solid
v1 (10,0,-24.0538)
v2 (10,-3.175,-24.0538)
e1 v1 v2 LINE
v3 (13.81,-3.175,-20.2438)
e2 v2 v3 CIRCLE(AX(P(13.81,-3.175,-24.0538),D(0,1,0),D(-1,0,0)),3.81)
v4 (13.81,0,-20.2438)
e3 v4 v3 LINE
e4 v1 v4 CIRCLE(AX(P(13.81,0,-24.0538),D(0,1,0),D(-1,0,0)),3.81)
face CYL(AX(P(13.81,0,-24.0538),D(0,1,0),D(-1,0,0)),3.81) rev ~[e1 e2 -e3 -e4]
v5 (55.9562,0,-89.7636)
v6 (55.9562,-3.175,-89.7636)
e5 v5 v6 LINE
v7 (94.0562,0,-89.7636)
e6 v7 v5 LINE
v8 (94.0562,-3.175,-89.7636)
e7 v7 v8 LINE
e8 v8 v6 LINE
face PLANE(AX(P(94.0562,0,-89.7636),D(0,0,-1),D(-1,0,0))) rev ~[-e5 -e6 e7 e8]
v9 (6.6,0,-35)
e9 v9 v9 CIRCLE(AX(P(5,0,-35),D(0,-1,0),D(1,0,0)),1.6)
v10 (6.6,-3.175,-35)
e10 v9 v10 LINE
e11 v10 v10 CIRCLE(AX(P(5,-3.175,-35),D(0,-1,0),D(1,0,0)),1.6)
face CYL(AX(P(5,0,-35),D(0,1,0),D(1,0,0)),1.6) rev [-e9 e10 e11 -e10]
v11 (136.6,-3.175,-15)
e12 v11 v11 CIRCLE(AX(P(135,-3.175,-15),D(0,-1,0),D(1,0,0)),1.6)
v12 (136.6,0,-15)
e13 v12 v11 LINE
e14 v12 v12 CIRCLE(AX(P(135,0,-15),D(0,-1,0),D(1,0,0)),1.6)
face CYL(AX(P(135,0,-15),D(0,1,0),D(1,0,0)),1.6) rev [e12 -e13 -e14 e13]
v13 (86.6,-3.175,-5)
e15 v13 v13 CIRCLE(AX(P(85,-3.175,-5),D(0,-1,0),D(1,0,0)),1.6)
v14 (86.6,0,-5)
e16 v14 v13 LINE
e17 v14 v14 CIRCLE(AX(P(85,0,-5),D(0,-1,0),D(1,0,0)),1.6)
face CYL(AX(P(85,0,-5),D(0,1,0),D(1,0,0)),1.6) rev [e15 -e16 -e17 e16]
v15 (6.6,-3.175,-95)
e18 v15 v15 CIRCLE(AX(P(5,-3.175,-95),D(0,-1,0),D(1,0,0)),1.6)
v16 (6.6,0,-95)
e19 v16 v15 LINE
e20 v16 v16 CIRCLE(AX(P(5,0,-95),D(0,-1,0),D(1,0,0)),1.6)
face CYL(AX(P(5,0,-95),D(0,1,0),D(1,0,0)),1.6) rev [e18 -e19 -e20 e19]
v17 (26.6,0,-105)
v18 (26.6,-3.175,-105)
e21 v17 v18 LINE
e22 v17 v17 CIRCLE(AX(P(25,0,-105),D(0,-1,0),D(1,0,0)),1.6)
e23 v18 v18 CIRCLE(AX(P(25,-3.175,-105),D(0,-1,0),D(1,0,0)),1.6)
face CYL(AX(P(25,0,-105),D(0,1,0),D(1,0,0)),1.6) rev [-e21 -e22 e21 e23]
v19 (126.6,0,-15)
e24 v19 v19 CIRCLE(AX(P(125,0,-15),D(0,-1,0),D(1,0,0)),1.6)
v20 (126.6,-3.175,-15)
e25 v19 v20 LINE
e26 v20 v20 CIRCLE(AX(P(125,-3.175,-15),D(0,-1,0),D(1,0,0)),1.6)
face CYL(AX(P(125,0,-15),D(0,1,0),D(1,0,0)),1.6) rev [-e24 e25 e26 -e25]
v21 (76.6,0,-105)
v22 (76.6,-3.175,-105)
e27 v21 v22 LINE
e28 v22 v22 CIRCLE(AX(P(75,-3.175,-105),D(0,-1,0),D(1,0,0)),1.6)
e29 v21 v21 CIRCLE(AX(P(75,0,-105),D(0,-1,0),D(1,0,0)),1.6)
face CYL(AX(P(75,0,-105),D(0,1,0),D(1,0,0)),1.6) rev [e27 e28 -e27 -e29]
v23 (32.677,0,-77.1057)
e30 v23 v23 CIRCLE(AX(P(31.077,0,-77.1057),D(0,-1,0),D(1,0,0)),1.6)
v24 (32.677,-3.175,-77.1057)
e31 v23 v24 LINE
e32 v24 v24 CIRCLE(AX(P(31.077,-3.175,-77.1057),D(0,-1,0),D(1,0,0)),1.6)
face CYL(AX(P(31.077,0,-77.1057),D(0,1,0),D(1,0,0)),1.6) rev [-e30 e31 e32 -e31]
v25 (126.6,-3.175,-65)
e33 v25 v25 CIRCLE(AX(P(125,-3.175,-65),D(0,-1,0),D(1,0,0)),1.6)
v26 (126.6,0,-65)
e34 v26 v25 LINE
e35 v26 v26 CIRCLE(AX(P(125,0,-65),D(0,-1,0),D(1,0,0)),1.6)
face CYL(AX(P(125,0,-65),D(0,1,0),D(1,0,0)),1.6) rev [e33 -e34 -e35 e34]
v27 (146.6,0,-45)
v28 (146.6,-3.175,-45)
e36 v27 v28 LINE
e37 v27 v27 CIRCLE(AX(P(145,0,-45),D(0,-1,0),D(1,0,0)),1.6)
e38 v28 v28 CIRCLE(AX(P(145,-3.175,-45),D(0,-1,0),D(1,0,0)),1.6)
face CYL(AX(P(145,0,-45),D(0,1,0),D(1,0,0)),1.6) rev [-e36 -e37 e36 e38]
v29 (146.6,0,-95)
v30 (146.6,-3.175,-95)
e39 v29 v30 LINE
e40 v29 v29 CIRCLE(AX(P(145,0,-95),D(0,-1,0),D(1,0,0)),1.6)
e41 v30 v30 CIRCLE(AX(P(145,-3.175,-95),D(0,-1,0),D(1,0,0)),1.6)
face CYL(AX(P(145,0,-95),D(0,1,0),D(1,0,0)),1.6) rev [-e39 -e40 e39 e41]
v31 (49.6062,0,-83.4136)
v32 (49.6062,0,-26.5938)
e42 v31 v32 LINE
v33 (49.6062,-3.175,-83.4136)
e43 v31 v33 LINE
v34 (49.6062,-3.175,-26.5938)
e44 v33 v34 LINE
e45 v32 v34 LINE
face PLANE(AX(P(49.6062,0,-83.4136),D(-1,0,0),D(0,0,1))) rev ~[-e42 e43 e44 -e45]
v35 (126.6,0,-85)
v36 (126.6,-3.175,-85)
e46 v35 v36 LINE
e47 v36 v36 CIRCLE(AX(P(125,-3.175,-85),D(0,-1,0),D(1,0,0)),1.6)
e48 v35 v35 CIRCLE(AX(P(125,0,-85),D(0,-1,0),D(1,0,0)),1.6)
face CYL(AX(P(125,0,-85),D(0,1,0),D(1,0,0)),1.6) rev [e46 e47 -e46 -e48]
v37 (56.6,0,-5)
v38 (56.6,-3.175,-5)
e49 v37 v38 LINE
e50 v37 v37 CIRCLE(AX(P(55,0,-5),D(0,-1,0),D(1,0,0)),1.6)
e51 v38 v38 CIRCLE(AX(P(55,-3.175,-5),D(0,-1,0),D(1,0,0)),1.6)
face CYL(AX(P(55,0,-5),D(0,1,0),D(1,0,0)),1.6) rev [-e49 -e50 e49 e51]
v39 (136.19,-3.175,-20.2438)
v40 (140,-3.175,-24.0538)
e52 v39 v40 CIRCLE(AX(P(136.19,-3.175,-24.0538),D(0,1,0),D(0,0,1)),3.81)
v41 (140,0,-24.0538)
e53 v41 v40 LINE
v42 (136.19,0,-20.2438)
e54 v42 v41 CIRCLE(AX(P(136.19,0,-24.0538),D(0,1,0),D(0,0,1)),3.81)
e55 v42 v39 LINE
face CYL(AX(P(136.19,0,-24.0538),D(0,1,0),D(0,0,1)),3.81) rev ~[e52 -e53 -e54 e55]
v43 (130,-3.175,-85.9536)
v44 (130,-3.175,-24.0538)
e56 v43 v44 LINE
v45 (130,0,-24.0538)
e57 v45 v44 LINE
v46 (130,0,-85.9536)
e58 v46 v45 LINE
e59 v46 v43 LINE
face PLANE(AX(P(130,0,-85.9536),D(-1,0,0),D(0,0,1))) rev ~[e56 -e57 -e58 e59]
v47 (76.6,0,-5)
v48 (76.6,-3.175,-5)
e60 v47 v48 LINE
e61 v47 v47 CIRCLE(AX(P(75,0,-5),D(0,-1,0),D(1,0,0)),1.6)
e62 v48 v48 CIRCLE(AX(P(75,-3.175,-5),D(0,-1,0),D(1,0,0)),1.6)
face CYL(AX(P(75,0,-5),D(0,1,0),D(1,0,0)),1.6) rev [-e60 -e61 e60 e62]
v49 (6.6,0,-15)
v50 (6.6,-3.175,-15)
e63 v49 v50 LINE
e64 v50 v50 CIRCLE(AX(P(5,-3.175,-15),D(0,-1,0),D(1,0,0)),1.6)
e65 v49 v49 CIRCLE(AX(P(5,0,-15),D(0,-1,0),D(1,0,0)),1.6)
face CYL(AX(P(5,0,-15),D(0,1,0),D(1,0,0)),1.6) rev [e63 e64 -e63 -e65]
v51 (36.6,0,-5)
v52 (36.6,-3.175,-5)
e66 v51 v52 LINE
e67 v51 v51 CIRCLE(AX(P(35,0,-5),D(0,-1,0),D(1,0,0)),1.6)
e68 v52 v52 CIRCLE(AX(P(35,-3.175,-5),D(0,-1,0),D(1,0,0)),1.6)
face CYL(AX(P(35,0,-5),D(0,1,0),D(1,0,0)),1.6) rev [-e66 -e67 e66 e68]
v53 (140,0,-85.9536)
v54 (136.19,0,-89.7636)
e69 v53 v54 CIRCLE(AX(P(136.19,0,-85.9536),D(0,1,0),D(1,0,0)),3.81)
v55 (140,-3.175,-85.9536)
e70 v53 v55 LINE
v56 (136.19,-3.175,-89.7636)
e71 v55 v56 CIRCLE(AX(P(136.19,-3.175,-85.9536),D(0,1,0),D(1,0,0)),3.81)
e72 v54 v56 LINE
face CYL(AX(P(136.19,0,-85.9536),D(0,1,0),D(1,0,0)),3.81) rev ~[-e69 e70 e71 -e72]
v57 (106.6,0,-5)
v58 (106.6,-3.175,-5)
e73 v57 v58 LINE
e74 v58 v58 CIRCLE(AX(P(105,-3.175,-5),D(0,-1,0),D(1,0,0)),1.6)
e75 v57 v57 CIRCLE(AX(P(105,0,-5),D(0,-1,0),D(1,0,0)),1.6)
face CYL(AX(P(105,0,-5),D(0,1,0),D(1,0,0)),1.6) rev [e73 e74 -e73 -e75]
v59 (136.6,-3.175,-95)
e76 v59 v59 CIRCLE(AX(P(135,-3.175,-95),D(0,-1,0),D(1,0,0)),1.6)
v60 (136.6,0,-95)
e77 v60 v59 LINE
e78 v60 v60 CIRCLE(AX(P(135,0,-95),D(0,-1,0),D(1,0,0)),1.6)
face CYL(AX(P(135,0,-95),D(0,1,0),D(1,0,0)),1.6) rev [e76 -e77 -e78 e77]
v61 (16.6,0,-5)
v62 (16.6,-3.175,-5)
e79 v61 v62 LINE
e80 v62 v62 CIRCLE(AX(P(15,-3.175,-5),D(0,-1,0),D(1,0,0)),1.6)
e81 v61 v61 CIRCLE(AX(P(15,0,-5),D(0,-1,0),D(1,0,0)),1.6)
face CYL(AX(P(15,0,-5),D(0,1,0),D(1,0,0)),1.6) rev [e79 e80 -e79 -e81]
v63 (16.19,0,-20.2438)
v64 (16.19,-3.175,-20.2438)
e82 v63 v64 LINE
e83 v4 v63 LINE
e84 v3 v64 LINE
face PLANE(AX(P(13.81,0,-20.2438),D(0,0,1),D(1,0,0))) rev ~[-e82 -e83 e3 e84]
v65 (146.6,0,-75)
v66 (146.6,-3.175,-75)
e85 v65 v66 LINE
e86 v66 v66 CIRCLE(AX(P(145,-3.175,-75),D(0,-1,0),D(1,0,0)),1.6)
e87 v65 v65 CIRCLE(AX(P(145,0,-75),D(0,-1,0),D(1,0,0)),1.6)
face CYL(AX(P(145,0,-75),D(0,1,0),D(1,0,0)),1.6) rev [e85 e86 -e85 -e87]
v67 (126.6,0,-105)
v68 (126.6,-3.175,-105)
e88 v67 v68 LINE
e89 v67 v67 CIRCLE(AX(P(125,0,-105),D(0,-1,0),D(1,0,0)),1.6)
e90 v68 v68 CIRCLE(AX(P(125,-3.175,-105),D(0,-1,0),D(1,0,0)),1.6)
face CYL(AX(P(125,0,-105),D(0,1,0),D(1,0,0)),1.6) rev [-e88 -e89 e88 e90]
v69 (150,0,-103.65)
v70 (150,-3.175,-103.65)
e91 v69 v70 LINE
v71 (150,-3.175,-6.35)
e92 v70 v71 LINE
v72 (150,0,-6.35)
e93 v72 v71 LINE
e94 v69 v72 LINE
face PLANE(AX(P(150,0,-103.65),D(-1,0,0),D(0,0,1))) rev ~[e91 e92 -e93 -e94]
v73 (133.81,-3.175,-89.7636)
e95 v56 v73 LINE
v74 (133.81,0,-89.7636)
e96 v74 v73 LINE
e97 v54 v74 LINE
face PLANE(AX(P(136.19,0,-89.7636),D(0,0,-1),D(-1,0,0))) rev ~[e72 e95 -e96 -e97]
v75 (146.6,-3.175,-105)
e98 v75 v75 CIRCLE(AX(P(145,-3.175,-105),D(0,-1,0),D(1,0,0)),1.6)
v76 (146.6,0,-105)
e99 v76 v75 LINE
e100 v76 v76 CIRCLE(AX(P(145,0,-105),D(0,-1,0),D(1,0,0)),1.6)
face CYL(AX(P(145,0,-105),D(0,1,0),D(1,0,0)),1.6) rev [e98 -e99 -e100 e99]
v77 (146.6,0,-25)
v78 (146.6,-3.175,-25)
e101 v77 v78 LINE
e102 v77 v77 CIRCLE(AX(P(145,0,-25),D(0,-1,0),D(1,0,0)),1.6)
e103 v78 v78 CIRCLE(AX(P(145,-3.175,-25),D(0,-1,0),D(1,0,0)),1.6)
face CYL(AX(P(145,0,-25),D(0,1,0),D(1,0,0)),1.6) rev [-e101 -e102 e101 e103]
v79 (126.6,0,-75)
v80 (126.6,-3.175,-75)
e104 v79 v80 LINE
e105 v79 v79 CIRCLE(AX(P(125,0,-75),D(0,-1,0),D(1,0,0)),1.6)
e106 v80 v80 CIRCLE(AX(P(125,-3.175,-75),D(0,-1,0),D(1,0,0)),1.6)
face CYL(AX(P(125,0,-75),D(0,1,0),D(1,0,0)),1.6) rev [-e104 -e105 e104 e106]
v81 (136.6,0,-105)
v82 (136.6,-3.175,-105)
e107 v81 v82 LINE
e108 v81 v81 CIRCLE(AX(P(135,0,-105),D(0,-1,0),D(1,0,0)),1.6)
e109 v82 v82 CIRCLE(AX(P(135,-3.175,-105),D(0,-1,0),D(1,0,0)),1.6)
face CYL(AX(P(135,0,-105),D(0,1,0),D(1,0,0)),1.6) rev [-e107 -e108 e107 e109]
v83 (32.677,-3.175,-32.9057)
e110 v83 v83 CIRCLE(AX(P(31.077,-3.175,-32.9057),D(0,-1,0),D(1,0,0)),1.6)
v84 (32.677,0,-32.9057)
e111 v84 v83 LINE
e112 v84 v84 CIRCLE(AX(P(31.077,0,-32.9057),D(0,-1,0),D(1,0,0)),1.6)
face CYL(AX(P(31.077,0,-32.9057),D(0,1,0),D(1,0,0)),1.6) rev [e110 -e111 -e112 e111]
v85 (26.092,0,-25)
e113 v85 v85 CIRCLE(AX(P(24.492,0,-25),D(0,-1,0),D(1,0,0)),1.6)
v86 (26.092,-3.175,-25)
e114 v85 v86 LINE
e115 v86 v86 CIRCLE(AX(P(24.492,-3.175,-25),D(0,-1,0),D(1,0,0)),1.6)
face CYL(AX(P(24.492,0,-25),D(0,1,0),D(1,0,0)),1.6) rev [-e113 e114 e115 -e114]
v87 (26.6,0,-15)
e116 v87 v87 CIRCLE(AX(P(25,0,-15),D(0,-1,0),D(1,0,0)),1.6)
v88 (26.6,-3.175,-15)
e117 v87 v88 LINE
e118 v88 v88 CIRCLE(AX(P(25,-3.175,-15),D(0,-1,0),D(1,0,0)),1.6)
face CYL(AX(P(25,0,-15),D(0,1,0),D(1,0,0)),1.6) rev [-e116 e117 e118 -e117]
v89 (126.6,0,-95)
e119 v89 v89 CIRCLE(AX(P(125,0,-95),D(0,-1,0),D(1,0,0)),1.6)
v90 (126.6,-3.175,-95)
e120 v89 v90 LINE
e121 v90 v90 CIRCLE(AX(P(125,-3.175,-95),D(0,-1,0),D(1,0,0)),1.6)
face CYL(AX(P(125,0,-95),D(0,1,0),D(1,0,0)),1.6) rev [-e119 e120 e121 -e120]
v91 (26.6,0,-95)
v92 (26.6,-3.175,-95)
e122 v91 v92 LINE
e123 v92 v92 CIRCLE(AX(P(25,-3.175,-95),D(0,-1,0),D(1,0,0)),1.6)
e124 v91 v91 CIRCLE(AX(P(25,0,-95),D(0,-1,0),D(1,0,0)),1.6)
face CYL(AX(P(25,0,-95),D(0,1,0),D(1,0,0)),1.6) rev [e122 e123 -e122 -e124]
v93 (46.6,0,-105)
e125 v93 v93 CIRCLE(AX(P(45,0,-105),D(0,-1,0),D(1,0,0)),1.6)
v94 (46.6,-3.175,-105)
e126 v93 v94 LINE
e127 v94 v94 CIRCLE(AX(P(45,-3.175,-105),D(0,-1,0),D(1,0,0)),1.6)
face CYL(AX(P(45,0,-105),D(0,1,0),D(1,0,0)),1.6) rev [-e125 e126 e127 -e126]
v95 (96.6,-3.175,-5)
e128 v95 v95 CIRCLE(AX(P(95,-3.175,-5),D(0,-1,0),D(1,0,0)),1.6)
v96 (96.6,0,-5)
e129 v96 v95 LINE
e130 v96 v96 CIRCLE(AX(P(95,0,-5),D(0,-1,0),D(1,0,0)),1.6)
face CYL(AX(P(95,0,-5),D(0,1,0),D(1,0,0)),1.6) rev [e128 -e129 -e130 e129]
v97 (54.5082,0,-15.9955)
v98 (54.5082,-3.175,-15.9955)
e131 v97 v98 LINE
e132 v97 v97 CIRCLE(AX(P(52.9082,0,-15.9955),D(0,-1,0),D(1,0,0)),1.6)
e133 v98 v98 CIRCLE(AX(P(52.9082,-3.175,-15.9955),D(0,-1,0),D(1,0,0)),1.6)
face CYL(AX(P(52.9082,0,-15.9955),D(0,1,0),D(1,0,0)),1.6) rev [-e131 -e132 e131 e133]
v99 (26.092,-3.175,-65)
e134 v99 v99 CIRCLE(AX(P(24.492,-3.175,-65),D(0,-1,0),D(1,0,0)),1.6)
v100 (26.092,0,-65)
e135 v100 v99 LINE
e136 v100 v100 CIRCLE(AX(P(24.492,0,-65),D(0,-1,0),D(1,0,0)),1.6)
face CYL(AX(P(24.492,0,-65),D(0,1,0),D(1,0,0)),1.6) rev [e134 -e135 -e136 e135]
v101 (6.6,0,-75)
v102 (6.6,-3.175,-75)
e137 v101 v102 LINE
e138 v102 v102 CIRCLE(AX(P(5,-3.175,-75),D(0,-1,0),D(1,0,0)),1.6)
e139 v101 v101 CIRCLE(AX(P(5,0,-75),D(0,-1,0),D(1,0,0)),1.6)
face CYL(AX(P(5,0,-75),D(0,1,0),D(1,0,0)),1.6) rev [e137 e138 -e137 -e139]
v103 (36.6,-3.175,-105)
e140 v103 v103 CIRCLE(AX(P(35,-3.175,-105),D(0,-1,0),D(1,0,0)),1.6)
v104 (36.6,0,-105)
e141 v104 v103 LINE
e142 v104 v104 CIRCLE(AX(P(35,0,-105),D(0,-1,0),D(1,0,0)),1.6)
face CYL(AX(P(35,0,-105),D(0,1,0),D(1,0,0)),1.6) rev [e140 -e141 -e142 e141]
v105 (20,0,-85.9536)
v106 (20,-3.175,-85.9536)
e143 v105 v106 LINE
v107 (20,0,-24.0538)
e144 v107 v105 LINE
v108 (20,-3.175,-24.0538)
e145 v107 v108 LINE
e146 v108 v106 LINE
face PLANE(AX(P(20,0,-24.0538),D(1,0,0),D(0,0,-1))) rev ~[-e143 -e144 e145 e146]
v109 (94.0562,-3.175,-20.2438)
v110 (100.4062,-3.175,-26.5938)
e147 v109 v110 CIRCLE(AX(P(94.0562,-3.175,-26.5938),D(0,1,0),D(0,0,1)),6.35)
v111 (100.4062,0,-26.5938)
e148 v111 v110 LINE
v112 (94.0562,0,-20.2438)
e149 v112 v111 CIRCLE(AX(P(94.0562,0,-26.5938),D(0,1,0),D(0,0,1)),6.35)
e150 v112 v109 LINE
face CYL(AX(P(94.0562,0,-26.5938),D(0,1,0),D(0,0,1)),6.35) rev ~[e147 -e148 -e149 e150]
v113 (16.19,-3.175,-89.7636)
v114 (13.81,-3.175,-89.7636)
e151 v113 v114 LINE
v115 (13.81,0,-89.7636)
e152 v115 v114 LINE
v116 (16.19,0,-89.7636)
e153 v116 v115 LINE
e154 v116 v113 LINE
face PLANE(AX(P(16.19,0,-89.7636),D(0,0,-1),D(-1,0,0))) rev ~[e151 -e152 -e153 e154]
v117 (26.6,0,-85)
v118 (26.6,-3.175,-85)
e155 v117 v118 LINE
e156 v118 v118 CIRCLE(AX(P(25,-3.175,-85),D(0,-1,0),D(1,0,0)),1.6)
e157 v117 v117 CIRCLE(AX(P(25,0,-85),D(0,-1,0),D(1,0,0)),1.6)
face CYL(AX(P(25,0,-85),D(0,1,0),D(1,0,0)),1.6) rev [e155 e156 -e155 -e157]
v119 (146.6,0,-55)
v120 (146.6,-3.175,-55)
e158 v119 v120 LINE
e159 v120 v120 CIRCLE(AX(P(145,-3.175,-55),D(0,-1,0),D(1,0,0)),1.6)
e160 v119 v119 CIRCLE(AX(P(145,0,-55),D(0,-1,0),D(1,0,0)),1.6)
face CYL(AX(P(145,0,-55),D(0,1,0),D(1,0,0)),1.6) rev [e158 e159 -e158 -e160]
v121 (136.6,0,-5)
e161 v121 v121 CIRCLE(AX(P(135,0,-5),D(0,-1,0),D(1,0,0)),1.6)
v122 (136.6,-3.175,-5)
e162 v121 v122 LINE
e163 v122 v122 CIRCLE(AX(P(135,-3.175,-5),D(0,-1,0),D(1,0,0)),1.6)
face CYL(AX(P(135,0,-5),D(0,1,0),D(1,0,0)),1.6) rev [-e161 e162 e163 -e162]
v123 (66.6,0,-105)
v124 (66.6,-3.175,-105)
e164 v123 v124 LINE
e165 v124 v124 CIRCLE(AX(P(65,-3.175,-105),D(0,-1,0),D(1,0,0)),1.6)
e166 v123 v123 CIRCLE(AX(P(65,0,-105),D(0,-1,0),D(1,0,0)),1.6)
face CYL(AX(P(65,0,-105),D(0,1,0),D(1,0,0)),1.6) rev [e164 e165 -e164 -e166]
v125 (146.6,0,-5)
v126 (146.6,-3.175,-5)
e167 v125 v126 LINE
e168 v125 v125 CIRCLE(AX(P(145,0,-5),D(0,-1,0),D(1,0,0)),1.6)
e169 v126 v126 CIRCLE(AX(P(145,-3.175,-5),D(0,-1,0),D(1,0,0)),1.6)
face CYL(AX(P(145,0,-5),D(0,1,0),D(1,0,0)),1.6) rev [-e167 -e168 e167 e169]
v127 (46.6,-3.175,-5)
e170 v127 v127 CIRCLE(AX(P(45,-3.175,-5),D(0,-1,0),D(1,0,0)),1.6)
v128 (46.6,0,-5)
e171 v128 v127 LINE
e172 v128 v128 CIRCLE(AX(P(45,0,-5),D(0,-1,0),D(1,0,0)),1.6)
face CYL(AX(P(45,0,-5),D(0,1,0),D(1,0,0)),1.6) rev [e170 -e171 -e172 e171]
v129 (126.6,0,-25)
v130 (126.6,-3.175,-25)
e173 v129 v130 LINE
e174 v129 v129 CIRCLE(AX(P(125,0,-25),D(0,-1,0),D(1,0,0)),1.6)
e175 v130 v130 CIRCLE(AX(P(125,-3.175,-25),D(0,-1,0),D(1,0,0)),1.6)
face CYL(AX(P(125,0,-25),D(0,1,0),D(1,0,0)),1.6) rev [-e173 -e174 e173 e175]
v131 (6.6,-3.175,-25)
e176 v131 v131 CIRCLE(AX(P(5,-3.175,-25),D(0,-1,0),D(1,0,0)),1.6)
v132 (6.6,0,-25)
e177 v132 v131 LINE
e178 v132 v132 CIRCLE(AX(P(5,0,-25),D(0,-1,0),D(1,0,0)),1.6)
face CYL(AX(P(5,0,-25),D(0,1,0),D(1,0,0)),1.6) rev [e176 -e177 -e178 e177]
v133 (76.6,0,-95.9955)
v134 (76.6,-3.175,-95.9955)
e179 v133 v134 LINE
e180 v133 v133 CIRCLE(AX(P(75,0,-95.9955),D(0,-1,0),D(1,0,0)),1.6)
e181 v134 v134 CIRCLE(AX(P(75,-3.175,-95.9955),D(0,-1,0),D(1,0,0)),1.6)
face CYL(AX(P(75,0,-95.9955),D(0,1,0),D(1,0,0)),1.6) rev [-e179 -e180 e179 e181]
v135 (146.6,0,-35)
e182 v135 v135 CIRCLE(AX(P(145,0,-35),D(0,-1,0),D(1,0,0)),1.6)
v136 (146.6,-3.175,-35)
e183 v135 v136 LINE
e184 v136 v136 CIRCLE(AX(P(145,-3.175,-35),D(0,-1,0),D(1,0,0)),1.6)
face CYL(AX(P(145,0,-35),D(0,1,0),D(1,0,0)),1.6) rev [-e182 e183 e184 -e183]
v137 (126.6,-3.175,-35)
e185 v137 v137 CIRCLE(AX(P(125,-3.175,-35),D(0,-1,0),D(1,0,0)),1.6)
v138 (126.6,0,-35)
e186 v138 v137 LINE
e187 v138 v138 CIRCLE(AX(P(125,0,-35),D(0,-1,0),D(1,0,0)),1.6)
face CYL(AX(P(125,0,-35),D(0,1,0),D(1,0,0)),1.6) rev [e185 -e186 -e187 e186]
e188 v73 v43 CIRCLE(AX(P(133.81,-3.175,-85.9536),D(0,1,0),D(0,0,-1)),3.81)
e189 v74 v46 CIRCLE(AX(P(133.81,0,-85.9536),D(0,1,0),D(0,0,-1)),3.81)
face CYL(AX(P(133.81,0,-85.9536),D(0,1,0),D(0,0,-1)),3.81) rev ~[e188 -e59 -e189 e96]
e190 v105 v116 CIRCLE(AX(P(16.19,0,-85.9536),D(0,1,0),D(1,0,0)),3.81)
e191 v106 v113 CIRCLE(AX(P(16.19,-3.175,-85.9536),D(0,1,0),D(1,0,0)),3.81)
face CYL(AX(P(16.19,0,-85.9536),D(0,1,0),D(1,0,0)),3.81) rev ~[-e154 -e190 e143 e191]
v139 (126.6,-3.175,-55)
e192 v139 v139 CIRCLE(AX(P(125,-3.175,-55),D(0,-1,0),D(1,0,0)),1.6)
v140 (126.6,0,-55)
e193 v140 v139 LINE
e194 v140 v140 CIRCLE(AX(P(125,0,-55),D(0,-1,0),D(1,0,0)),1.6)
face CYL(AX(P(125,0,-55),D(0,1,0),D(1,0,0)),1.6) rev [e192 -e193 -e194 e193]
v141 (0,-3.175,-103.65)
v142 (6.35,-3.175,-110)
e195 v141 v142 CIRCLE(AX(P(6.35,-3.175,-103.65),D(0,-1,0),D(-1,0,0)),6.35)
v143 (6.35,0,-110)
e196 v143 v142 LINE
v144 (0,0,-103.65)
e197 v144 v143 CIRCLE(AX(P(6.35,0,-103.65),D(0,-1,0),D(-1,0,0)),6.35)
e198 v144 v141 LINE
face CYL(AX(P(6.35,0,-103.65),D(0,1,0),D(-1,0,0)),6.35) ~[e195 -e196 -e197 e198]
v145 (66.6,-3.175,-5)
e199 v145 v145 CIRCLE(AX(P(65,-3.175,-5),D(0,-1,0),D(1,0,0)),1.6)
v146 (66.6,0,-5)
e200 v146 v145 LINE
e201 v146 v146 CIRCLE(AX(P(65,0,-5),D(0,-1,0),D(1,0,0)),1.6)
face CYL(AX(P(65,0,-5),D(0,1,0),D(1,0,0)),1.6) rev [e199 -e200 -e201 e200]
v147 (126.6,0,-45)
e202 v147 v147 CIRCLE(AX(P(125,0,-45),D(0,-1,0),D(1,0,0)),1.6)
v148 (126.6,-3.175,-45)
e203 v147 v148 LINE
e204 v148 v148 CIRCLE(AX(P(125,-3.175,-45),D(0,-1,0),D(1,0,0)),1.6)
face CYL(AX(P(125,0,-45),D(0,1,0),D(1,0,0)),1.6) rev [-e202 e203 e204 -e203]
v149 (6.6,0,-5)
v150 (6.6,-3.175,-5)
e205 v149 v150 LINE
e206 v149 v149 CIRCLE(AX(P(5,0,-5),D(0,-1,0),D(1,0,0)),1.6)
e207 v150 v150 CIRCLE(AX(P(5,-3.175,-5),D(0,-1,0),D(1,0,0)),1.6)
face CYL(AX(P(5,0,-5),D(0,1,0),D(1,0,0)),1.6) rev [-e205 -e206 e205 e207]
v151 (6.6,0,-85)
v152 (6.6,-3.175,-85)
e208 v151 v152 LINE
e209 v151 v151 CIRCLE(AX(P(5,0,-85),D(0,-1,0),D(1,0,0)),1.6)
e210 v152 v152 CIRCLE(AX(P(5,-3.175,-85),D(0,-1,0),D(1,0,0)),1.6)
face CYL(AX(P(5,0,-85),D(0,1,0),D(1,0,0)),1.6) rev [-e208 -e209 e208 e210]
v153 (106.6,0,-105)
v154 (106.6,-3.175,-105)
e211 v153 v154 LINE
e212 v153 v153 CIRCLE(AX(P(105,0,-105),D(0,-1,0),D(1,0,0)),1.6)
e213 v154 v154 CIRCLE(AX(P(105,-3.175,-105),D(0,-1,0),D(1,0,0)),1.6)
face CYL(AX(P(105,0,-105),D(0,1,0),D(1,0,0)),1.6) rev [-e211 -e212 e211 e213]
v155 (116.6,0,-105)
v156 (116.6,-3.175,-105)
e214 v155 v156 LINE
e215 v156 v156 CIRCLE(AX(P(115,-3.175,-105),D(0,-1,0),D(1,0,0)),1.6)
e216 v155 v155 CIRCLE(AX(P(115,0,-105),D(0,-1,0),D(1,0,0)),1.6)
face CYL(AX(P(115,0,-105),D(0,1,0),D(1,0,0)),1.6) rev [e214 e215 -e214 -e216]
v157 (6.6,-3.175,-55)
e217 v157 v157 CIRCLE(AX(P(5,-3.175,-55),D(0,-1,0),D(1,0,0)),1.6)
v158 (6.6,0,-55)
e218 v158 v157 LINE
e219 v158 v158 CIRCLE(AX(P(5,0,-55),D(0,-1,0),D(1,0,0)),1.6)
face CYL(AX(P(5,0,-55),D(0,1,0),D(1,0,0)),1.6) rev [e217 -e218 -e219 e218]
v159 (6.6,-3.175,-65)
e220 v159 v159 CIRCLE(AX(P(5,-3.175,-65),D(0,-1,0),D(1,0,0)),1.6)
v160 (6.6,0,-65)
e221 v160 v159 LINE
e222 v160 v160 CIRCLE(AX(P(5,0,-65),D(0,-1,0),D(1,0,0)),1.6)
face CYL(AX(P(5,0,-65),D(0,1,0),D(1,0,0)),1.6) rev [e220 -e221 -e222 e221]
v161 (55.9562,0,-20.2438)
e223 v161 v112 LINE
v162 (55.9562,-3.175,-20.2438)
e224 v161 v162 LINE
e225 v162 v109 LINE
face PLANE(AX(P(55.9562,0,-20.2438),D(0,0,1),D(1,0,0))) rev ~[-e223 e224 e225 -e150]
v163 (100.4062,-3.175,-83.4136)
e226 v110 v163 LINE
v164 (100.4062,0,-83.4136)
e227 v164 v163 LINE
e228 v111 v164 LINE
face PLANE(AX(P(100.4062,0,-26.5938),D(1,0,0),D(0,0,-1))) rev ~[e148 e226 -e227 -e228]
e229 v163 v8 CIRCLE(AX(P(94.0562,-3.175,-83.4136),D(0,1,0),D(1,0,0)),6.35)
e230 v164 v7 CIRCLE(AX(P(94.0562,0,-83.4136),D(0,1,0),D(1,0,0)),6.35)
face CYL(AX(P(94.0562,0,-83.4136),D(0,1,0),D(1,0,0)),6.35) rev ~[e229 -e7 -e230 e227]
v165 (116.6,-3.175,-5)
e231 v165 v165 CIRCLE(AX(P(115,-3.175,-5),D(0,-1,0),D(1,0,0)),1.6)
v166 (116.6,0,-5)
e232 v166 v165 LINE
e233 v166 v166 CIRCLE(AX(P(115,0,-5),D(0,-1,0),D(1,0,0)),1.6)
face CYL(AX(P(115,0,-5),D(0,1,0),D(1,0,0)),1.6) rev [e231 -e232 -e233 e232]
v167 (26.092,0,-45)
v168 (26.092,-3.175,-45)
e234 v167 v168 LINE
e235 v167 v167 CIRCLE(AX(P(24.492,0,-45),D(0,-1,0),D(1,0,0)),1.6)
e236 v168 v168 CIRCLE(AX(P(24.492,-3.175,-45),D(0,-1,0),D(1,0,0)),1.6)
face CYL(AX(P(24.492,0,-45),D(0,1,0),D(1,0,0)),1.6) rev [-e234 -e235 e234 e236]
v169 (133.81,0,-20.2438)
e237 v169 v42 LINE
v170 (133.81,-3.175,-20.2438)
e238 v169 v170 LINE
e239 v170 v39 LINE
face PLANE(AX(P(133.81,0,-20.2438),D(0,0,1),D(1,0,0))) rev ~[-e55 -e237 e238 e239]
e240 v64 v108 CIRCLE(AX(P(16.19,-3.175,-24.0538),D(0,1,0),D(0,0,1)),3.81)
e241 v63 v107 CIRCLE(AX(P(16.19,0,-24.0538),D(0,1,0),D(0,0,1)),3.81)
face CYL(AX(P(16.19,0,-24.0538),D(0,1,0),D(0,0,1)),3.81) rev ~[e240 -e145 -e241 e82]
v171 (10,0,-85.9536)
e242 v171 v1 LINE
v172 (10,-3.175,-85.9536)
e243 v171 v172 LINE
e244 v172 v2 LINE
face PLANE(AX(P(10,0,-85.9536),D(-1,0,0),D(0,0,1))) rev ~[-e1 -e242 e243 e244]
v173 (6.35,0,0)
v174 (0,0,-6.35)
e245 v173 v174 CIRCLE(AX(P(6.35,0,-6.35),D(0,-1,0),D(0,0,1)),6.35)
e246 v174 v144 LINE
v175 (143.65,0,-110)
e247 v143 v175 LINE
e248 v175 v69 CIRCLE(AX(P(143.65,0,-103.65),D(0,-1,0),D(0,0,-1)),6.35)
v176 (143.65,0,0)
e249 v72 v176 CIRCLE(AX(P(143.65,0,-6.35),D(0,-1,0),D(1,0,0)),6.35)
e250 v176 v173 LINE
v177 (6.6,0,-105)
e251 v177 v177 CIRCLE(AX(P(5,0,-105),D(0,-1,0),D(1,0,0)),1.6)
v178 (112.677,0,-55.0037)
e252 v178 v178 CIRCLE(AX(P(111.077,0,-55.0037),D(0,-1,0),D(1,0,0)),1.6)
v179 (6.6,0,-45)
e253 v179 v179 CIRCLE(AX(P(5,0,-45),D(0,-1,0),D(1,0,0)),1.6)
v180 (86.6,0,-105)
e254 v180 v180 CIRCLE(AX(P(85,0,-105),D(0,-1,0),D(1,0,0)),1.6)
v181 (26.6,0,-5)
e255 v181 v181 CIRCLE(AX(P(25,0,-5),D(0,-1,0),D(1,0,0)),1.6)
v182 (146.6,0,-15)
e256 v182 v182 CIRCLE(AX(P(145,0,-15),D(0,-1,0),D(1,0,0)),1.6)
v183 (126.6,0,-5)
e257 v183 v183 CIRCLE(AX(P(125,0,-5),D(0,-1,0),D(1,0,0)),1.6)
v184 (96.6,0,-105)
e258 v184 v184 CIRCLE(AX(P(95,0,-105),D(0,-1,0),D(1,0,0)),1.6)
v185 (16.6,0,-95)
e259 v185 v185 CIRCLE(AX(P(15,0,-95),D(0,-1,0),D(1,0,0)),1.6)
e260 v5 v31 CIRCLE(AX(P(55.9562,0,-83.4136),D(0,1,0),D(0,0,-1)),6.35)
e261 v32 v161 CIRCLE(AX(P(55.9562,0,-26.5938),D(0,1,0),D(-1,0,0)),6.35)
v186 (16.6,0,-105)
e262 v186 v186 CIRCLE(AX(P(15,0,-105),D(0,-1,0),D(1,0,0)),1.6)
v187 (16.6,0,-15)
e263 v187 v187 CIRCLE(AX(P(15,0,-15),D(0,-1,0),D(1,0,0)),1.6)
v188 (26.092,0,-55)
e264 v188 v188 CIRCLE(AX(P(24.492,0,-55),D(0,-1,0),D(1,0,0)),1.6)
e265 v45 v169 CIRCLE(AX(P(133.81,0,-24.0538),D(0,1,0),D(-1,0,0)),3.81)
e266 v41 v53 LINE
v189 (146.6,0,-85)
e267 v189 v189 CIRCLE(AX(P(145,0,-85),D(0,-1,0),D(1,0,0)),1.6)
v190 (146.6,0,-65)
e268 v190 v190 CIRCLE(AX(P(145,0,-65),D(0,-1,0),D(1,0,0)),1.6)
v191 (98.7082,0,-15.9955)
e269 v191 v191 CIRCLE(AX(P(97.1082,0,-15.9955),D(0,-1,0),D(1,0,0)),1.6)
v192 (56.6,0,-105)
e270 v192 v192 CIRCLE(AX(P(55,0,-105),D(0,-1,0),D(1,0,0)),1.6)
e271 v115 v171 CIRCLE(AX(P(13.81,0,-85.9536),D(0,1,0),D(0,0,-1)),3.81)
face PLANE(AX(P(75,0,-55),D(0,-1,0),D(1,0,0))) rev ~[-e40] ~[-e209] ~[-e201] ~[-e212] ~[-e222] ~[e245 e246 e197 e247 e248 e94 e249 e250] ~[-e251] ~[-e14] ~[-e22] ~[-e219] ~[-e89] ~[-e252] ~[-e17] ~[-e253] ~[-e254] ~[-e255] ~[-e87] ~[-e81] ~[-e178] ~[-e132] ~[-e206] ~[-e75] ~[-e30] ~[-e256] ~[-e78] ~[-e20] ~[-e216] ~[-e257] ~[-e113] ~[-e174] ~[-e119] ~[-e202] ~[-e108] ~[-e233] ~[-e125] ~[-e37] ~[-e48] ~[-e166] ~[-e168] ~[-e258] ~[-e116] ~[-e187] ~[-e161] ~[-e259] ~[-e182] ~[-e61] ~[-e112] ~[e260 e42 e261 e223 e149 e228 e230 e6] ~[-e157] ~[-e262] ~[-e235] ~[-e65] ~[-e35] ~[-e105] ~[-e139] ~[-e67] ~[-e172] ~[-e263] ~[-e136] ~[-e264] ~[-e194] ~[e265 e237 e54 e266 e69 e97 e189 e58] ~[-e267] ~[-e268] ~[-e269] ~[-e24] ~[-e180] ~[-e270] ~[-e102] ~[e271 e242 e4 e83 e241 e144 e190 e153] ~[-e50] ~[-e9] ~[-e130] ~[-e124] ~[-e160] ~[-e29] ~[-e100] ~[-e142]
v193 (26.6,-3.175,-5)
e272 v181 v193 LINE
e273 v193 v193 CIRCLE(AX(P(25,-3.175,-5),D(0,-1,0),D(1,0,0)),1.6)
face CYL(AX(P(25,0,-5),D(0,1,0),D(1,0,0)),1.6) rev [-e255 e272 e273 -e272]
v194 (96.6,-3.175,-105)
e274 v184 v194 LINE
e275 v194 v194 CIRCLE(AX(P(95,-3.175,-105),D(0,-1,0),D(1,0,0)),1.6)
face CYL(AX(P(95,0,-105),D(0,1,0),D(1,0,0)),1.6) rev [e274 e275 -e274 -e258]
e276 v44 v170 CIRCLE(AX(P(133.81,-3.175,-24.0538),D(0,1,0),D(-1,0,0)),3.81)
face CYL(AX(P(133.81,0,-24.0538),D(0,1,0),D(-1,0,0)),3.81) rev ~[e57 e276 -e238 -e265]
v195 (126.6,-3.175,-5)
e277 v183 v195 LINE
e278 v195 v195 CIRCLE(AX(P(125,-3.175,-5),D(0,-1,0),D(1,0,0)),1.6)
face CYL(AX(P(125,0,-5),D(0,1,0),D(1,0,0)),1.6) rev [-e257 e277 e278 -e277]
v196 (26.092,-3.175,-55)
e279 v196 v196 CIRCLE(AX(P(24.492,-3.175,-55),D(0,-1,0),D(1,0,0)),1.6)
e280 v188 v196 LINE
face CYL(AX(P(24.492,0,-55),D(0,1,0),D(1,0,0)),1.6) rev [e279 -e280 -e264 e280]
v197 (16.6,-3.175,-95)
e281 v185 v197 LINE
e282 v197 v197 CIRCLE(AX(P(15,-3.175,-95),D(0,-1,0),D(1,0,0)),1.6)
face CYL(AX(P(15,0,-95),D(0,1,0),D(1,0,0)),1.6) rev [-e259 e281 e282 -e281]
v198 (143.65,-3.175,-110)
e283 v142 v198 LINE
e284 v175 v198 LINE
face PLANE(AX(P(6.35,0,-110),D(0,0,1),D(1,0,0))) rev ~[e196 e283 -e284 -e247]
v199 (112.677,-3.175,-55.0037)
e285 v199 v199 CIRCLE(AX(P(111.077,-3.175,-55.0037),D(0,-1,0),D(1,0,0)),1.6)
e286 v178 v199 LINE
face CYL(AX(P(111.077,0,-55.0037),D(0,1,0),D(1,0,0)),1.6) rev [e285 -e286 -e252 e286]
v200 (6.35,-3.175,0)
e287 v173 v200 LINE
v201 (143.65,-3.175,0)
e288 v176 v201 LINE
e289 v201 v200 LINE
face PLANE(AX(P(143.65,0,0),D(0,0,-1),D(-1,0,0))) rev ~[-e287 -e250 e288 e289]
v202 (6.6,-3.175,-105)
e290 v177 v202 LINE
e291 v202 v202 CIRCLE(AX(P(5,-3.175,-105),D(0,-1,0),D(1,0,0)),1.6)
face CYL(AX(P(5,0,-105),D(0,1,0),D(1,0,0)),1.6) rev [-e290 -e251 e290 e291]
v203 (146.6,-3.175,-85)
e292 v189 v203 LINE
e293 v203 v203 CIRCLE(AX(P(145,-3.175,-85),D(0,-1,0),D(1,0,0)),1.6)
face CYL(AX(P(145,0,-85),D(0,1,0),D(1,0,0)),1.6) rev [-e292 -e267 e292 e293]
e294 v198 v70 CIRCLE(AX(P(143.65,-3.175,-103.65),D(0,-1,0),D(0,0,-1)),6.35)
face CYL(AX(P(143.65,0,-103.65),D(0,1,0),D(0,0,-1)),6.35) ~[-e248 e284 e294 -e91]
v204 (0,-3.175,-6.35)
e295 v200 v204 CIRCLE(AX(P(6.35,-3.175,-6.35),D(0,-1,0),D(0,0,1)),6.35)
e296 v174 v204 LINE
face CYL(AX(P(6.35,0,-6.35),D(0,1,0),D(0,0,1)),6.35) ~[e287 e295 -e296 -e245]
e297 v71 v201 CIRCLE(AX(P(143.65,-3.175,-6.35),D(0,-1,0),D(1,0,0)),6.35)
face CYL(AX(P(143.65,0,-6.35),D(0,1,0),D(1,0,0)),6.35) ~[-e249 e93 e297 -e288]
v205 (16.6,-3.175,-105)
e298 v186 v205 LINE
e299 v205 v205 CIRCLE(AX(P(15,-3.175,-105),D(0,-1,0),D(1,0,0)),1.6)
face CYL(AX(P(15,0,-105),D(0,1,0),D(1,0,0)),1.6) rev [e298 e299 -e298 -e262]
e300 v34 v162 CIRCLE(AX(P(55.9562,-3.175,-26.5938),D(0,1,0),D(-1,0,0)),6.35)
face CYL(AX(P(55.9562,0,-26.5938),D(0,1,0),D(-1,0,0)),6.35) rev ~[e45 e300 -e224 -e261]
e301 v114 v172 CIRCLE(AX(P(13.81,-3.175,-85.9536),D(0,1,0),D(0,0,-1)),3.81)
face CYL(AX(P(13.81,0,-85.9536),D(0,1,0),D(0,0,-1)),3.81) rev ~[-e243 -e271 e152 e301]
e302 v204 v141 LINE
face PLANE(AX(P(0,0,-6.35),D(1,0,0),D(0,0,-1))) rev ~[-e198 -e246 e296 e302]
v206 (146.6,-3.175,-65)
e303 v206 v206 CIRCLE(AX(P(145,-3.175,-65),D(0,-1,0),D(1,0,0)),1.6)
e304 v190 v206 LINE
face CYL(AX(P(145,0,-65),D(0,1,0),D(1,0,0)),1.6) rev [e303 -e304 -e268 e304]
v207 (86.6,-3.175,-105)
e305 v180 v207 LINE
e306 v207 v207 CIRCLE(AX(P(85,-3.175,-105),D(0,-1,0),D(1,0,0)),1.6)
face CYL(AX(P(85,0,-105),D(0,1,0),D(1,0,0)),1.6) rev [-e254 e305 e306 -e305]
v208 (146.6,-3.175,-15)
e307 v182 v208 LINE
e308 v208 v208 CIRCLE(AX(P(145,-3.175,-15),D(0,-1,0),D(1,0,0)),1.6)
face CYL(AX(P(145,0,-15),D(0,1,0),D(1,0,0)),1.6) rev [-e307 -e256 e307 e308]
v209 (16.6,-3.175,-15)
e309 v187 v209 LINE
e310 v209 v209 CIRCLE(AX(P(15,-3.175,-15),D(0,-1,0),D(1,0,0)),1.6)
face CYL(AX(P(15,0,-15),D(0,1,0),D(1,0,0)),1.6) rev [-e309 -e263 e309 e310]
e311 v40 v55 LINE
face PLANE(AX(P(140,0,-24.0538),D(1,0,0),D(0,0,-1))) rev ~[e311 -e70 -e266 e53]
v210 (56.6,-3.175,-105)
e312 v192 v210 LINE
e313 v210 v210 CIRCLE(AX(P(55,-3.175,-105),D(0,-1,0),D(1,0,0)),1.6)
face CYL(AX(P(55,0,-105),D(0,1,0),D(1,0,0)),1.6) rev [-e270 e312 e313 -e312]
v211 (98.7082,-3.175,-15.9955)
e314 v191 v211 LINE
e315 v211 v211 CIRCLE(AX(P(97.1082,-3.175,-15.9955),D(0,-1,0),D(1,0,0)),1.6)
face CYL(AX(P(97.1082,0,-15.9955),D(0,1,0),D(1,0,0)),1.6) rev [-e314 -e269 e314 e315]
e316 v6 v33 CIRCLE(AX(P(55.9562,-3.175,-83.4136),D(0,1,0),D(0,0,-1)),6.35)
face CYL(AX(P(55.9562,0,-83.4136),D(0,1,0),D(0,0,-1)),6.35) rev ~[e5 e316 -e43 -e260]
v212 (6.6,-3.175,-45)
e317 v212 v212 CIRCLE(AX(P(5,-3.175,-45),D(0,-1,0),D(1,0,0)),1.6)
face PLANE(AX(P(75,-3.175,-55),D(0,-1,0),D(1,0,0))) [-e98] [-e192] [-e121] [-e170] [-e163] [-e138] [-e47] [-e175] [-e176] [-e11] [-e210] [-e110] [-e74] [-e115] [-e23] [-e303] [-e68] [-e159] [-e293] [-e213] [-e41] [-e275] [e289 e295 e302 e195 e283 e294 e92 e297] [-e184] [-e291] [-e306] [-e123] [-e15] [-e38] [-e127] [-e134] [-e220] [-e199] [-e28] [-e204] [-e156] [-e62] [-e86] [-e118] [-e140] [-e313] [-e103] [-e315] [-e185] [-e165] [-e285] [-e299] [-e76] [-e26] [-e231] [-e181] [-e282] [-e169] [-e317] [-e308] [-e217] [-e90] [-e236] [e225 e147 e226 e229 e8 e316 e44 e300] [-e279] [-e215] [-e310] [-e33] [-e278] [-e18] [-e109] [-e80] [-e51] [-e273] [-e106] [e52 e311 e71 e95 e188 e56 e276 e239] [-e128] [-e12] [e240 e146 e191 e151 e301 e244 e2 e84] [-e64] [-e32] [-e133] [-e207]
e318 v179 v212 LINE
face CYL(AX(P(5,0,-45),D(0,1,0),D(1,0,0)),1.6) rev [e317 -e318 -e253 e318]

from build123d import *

# Parameters (mm, degrees)
F0_R     = 1.6
F1_DEPTH = 3.175


# Not quite as in the source:
# - a length typed as a fraction of an inch, garbled in the dataset ("3 / 203.2 mm" for 3/8 in), is restored


with BuildPart() as f1:
    # F0 (on Front) → F1 (new body)
    with BuildSketch(Plane.XZ):
        with BuildLine():
            Line((143.65, 0), (6.35, 0))
            ThreePointArc((6.35, 0), (1.8598719395, -1.8598719395), (0, -6.35))
            Line((0, -6.35), (0, -103.65))
            ThreePointArc((0, -103.65), (1.8598719395, -108.1401280605), (6.35, -110))
            Line((6.35, -110), (143.65, -110))
            ThreePointArc((143.65, -110), (148.1401280605, -108.1401280605), (150, -103.65))
            Line((150, -103.65), (150, -6.35))
            ThreePointArc((150, -6.35), (148.1401280605, -1.8598719395), (143.65, 0))
        make_face()
        with Locations((5, -105)):
            Circle(F0_R, mode=Mode.SUBTRACT)
        with Locations((15, -105)):
            Circle(F0_R, mode=Mode.SUBTRACT)
        with Locations((25, -105)):
            Circle(F0_R, mode=Mode.SUBTRACT)
        with Locations((35, -105)):
            Circle(F0_R, mode=Mode.SUBTRACT)
        with Locations((5, -95)):
            Circle(F0_R, mode=Mode.SUBTRACT)
        with Locations((15, -95)):
            Circle(F0_R, mode=Mode.SUBTRACT)
        with Locations((5, -85)):
            Circle(F0_R, mode=Mode.SUBTRACT)
        with Locations((25, -95)):
            Circle(F0_R, mode=Mode.SUBTRACT)
        with Locations((25, -85)):
            Circle(F0_R, mode=Mode.SUBTRACT)
        with Locations((45, -105)):
            Circle(F0_R, mode=Mode.SUBTRACT)
        with Locations((55, -105)):
            Circle(F0_R, mode=Mode.SUBTRACT)
        with Locations((65, -105)):
            Circle(F0_R, mode=Mode.SUBTRACT)
        with Locations((5, -75)):
            Circle(F0_R, mode=Mode.SUBTRACT)
        with Locations((31.077, -77.1057)):
            Circle(F0_R, mode=Mode.SUBTRACT)
        with Locations((5, -65)):
            Circle(F0_R, mode=Mode.SUBTRACT)
        with BuildLine():
            ThreePointArc((10, -24.0538), (11.1159231637, -21.3597231637), (13.81, -20.2438))
            Line((13.81, -20.2438), (16.19, -20.2438))
            ThreePointArc((16.19, -20.2438), (18.8840768363, -21.3597231637), (20, -24.0538))
            Line((20, -24.0538), (20, -85.9536))
            ThreePointArc((20, -85.9536), (18.8840768363, -88.6476768363), (16.19, -89.7636))
            Line((16.19, -89.7636), (13.81, -89.7636))
            ThreePointArc((13.81, -89.7636), (11.1159231637, -88.6476768363), (10, -85.9536))
            Line((10, -85.9536), (10, -24.0538))
        make_face(mode=Mode.SUBTRACT)
        with Locations((24.492, -65)):
            Circle(F0_R, mode=Mode.SUBTRACT)
        with Locations((75, -105)):
            Circle(F0_R, mode=Mode.SUBTRACT)
        with Locations((85, -105)):
            Circle(F0_R, mode=Mode.SUBTRACT)
        with Locations((95, -105)):
            Circle(F0_R, mode=Mode.SUBTRACT)
        with Locations((105, -105)):
            Circle(F0_R, mode=Mode.SUBTRACT)
        with Locations((75, -95.9955)):
            Circle(F0_R, mode=Mode.SUBTRACT)
        with Locations((115, -105)):
            Circle(F0_R, mode=Mode.SUBTRACT)
        with Locations((125, -105)):
            Circle(F0_R, mode=Mode.SUBTRACT)
        with Locations((135, -105)):
            Circle(F0_R, mode=Mode.SUBTRACT)
        with Locations((145, -105)):
            Circle(F0_R, mode=Mode.SUBTRACT)
        with Locations((125, -95)):
            Circle(F0_R, mode=Mode.SUBTRACT)
        with Locations((125, -85)):
            Circle(F0_R, mode=Mode.SUBTRACT)
        with Locations((135, -95)):
            Circle(F0_R, mode=Mode.SUBTRACT)
        with Locations((145, -95)):
            Circle(F0_R, mode=Mode.SUBTRACT)
        with Locations((145, -85)):
            Circle(F0_R, mode=Mode.SUBTRACT)
        with BuildLine():
            Line((49.6062, -83.4136), (49.6062, -26.5938))
            ThreePointArc((49.6062, -26.5938), (51.4660719395, -22.1036719395), (55.9562, -20.2438))
            Line((55.9562, -20.2438), (94.0562, -20.2438))
            ThreePointArc((94.0562, -20.2438), (98.5463280605, -22.1036719395), (100.4062, -26.5938))
            Line((100.4062, -26.5938), (100.4062, -83.4136))
            ThreePointArc((100.4062, -83.4136), (98.5463280605, -87.9037280605), (94.0562, -89.7636))
            Line((94.0562, -89.7636), (55.9562, -89.7636))
            ThreePointArc((55.9562, -89.7636), (51.4660719395, -87.9037280605), (49.6062, -83.4136))
        make_face(mode=Mode.SUBTRACT)
        with Locations((111.077, -55.0037)):
            Circle(F0_R, mode=Mode.SUBTRACT)
        with Locations((125, -75)):
            Circle(F0_R, mode=Mode.SUBTRACT)
        with Locations((145, -75)):
            Circle(F0_R, mode=Mode.SUBTRACT)
        with Locations((125, -65)):
            Circle(F0_R, mode=Mode.SUBTRACT)
        with Locations((145, -65)):
            Circle(F0_R, mode=Mode.SUBTRACT)
        with BuildLine():
            ThreePointArc((130, -24.0538), (131.1159231637, -21.3597231637), (133.81, -20.2438))
            Line((133.81, -20.2438), (136.19, -20.2438))
            ThreePointArc((136.19, -20.2438), (138.8840768363, -21.3597231637), (140, -24.0538))
            Line((140, -24.0538), (140, -85.9536))
            ThreePointArc((140, -85.9536), (138.8840768363, -88.6476768363), (136.19, -89.7636))
            Line((136.19, -89.7636), (133.81, -89.7636))
            ThreePointArc((133.81, -89.7636), (131.1159231637, -88.6476768363), (130, -85.9536))
            Line((130, -85.9536), (130, -24.0538))
        make_face(mode=Mode.SUBTRACT)
        with Locations((5, -55)):
            Circle(F0_R, mode=Mode.SUBTRACT)
        with Locations((5, -45)):
            Circle(F0_R, mode=Mode.SUBTRACT)
        with Locations((24.492, -55)):
            Circle(F0_R, mode=Mode.SUBTRACT)
        with Locations((24.492, -45)):
            Circle(F0_R, mode=Mode.SUBTRACT)
        with Locations((5, -35)):
            Circle(F0_R, mode=Mode.SUBTRACT)
        with Locations((31.077, -32.9057)):
            Circle(F0_R, mode=Mode.SUBTRACT)
        with Locations((5, -25)):
            Circle(F0_R, mode=Mode.SUBTRACT)
        with Locations((5, -15)):
            Circle(F0_R, mode=Mode.SUBTRACT)
        with Locations((15, -15)):
            Circle(F0_R, mode=Mode.SUBTRACT)
        with Locations((24.492, -25)):
            Circle(F0_R, mode=Mode.SUBTRACT)
        with Locations((25, -15)):
            Circle(F0_R, mode=Mode.SUBTRACT)
        with Locations((5, -5)):
            Circle(F0_R, mode=Mode.SUBTRACT)
        with Locations((15, -5)):
            Circle(F0_R, mode=Mode.SUBTRACT)
        with Locations((25, -5)):
            Circle(F0_R, mode=Mode.SUBTRACT)
        with Locations((35, -5)):
            Circle(F0_R, mode=Mode.SUBTRACT)
        with Locations((52.9082, -15.9955)):
            Circle(F0_R, mode=Mode.SUBTRACT)
        with Locations((45, -5)):
            Circle(F0_R, mode=Mode.SUBTRACT)
        with Locations((55, -5)):
            Circle(F0_R, mode=Mode.SUBTRACT)
        with Locations((65, -5)):
            Circle(F0_R, mode=Mode.SUBTRACT)
        with Locations((125, -55)):
            Circle(F0_R, mode=Mode.SUBTRACT)
        with Locations((125, -45)):
            Circle(F0_R, mode=Mode.SUBTRACT)
        with Locations((145, -55)):
            Circle(F0_R, mode=Mode.SUBTRACT)
        with Locations((145, -45)):
            Circle(F0_R, mode=Mode.SUBTRACT)
        with Locations((125, -35)):
            Circle(F0_R, mode=Mode.SUBTRACT)
        with Locations((145, -35)):
            Circle(F0_R, mode=Mode.SUBTRACT)
        with Locations((97.1082, -15.9955)):
            Circle(F0_R, mode=Mode.SUBTRACT)
        with Locations((75, -5)):
            Circle(F0_R, mode=Mode.SUBTRACT)
        with Locations((85, -5)):
            Circle(F0_R, mode=Mode.SUBTRACT)
        with Locations((95, -5)):
            Circle(F0_R, mode=Mode.SUBTRACT)
        with Locations((105, -5)):
            Circle(F0_R, mode=Mode.SUBTRACT)
        with Locations((125, -25)):
            Circle(F0_R, mode=Mode.SUBTRACT)
        with Locations((125, -15)):
            Circle(F0_R, mode=Mode.SUBTRACT)
        with Locations((145, -25)):
            Circle(F0_R, mode=Mode.SUBTRACT)
        with Locations((135, -15)):
            Circle(F0_R, mode=Mode.SUBTRACT)
        with Locations((145, -15)):
            Circle(F0_R, mode=Mode.SUBTRACT)
        with Locations((115, -5)):
            Circle(F0_R, mode=Mode.SUBTRACT)
        with Locations((125, -5)):
            Circle(F0_R, mode=Mode.SUBTRACT)
        with Locations((135, -5)):
            Circle(F0_R, mode=Mode.SUBTRACT)
        with Locations((145, -5)):
            Circle(F0_R, mode=Mode.SUBTRACT)
    extrude(amount=F1_DEPTH)


solid = f1.part
